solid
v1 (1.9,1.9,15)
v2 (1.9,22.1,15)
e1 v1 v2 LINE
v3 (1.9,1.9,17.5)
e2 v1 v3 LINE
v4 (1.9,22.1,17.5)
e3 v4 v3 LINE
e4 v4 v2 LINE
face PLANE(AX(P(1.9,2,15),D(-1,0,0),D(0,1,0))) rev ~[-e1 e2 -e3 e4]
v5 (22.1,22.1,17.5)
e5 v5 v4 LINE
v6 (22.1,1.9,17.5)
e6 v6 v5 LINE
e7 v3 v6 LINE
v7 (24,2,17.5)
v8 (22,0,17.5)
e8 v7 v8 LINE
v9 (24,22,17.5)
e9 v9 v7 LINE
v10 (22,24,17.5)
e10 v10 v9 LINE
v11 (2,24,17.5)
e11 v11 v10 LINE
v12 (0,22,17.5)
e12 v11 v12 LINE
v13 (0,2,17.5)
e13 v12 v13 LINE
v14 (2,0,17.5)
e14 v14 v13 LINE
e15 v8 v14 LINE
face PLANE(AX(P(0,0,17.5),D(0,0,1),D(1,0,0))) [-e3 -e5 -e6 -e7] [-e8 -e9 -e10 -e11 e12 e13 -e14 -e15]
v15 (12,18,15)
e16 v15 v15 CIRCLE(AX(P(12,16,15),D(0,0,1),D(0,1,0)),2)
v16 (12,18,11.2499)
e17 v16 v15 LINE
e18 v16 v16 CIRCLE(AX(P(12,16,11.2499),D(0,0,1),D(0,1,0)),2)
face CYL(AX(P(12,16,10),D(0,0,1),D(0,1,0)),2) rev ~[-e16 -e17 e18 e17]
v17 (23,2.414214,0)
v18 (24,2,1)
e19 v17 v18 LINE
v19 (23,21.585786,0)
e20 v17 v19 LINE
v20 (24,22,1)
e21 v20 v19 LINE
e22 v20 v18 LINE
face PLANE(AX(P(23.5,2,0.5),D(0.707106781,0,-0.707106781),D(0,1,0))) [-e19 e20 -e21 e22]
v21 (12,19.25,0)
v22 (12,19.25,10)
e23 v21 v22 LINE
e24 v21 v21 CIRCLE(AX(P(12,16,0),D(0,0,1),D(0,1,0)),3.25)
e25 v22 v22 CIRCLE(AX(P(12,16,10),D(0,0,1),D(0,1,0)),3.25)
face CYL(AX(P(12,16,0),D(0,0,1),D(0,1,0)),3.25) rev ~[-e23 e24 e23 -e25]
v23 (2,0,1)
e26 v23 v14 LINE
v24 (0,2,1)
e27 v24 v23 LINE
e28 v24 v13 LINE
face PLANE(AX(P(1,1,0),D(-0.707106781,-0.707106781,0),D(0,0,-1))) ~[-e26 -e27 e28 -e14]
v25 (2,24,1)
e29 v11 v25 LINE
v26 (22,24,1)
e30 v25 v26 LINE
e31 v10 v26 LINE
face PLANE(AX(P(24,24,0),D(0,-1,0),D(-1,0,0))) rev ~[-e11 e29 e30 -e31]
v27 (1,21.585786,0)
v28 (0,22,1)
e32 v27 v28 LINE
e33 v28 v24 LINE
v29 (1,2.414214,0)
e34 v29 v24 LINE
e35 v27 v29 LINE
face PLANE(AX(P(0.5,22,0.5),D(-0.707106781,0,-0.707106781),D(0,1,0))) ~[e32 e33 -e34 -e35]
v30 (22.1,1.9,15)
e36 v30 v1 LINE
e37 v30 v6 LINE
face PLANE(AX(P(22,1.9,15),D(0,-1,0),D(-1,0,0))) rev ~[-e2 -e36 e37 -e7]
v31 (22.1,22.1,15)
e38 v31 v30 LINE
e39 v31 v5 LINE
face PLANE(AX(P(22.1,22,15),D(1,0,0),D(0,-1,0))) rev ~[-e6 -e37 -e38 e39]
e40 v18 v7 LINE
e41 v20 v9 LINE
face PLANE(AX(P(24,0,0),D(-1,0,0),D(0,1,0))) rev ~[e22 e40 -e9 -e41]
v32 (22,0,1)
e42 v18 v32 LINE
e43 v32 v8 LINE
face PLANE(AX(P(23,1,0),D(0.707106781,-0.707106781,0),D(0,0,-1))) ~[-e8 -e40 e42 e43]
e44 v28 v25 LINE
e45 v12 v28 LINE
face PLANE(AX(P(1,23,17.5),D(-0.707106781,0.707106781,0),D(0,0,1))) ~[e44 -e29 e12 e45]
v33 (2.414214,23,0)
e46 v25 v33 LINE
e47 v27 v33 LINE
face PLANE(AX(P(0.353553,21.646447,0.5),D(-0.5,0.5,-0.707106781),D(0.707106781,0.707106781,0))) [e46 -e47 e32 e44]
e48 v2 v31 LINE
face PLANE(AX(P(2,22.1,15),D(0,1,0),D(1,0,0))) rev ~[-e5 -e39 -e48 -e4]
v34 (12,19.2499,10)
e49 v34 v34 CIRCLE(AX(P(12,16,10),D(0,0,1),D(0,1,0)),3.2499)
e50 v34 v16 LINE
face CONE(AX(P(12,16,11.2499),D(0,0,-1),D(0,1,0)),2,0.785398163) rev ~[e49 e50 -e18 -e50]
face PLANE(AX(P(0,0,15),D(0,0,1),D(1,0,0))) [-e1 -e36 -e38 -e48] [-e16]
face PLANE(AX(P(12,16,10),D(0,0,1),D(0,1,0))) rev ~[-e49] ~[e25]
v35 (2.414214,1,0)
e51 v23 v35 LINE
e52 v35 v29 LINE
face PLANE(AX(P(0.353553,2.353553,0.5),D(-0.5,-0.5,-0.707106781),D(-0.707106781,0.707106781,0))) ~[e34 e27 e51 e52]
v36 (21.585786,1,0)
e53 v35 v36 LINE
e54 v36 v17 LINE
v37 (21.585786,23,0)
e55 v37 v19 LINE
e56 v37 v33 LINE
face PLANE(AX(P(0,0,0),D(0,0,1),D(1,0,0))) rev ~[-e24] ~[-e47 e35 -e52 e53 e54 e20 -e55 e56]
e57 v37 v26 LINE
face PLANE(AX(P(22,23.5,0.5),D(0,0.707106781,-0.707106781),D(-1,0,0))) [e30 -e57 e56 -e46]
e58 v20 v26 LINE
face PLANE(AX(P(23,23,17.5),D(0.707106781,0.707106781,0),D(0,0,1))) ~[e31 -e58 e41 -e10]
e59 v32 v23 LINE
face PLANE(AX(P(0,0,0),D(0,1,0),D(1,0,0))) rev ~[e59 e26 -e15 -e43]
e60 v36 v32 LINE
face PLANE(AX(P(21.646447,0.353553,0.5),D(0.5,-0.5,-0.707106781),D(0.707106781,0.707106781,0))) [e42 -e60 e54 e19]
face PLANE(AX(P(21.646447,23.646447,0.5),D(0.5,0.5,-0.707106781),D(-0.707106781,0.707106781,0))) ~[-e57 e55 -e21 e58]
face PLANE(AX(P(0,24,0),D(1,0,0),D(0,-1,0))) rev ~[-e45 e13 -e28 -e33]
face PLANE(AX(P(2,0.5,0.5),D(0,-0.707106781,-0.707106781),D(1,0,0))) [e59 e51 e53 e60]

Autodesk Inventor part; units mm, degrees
ref_plane "YZ Plane" through (0, 0, 0) normal (1, 0, 0) x (0, 1, 0)
ref_plane "XZ Plane" through (0, 0, 0) normal (0, 1, 0) x (-1, 0, 0)
ref_plane "XY Plane" through (0, 0, 0) normal (0, 0, 1) x (1, 0, 0)
sketch "Sketch1" plane through (0, 0, 0) normal (0, 0, 1) x (1, 0, 0)
  line L0 (0, 0) -> (24, 0)
  line L1 (24, 0) -> (24, 24)
  line L2 (24, 24) -> (0, 24)
  line L3 (0, 24) -> (0, 0)
  dimension "d0" = 24
  dimension "d1" = 24
extrude "Extrusion1" add sketch "Sketch1" along normal blind 15
sketch "Sketch2" plane through (0, 0, 15) normal (0, 0, 1) x (1, 0, 0)
  line L0 (24, 0) -> (24, 24) projected
  line L1 (24, 24) -> (0, 24) projected
  line L2 (0, 24) -> (0, 0) projected
  line L3 (0, 0) -> (24, 0) projected
  line L4 (2, 22) -> (22, 22)
  line L5 (22, 22) -> (22, 2)
  line L6 (22, 2) -> (2, 2)
  line L7 (2, 2) -> (2, 22)
  dimension "d4" = 2
extrude "Extrusion2" add sketch "Sketch2" along normal blind 2.5
chamfer "Chamfer1" distance 2 angle 45 4 edges at (0, 24, 8.75) (0, 0, 8.75) (24, 0, 8.75) (24, 24, 8.75)
sketch "Sketch3" plane through (0, 0, 0) normal (0, 0, -1) x (-1, 0, 0)
  line L0 (-2, 22) -> (-2, 2) projected
  line L1 (-2, 2) -> (-22, 2) projected
  line L2 (-22, 2) -> (-22, 22) projected
  line L3 (-22, 22) -> (-2, 22) projected
  point P0 (0, 0)
  point P1 (-12, 16)
  point P2 (-12, 22)
  dimension "d10" = 6
hole "Hole1" at (12, 16, 0) direction (0, 0, 1) diameter 4 depth 24 counterbore diameter 6.5 counterbore depth 10
chamfer "Chamfer2" distance 1 angle 45 8 edges at (12, 0, 0) (23, 1, 0) (24, 12, 0) (23, 23, 0) (12, 24, 0) (0, 12, 0) (1, 23, 0) (1, 1, 0)
thicken "Thicken1" operation add thickness 0.1 both sides no extend neighbours yes toward (1, 0, 0) faces at (22, 15.3333, 16.6667) (15.3333, 2, 16.6667) (2, 8.6667, 16.6667) (8.6667, 22, 15.8333)
chamfer "Chamfer3" distance 1.25 angle 45 1 edges at (12, 14, 10)
properties part number "Idle Side Foot"
